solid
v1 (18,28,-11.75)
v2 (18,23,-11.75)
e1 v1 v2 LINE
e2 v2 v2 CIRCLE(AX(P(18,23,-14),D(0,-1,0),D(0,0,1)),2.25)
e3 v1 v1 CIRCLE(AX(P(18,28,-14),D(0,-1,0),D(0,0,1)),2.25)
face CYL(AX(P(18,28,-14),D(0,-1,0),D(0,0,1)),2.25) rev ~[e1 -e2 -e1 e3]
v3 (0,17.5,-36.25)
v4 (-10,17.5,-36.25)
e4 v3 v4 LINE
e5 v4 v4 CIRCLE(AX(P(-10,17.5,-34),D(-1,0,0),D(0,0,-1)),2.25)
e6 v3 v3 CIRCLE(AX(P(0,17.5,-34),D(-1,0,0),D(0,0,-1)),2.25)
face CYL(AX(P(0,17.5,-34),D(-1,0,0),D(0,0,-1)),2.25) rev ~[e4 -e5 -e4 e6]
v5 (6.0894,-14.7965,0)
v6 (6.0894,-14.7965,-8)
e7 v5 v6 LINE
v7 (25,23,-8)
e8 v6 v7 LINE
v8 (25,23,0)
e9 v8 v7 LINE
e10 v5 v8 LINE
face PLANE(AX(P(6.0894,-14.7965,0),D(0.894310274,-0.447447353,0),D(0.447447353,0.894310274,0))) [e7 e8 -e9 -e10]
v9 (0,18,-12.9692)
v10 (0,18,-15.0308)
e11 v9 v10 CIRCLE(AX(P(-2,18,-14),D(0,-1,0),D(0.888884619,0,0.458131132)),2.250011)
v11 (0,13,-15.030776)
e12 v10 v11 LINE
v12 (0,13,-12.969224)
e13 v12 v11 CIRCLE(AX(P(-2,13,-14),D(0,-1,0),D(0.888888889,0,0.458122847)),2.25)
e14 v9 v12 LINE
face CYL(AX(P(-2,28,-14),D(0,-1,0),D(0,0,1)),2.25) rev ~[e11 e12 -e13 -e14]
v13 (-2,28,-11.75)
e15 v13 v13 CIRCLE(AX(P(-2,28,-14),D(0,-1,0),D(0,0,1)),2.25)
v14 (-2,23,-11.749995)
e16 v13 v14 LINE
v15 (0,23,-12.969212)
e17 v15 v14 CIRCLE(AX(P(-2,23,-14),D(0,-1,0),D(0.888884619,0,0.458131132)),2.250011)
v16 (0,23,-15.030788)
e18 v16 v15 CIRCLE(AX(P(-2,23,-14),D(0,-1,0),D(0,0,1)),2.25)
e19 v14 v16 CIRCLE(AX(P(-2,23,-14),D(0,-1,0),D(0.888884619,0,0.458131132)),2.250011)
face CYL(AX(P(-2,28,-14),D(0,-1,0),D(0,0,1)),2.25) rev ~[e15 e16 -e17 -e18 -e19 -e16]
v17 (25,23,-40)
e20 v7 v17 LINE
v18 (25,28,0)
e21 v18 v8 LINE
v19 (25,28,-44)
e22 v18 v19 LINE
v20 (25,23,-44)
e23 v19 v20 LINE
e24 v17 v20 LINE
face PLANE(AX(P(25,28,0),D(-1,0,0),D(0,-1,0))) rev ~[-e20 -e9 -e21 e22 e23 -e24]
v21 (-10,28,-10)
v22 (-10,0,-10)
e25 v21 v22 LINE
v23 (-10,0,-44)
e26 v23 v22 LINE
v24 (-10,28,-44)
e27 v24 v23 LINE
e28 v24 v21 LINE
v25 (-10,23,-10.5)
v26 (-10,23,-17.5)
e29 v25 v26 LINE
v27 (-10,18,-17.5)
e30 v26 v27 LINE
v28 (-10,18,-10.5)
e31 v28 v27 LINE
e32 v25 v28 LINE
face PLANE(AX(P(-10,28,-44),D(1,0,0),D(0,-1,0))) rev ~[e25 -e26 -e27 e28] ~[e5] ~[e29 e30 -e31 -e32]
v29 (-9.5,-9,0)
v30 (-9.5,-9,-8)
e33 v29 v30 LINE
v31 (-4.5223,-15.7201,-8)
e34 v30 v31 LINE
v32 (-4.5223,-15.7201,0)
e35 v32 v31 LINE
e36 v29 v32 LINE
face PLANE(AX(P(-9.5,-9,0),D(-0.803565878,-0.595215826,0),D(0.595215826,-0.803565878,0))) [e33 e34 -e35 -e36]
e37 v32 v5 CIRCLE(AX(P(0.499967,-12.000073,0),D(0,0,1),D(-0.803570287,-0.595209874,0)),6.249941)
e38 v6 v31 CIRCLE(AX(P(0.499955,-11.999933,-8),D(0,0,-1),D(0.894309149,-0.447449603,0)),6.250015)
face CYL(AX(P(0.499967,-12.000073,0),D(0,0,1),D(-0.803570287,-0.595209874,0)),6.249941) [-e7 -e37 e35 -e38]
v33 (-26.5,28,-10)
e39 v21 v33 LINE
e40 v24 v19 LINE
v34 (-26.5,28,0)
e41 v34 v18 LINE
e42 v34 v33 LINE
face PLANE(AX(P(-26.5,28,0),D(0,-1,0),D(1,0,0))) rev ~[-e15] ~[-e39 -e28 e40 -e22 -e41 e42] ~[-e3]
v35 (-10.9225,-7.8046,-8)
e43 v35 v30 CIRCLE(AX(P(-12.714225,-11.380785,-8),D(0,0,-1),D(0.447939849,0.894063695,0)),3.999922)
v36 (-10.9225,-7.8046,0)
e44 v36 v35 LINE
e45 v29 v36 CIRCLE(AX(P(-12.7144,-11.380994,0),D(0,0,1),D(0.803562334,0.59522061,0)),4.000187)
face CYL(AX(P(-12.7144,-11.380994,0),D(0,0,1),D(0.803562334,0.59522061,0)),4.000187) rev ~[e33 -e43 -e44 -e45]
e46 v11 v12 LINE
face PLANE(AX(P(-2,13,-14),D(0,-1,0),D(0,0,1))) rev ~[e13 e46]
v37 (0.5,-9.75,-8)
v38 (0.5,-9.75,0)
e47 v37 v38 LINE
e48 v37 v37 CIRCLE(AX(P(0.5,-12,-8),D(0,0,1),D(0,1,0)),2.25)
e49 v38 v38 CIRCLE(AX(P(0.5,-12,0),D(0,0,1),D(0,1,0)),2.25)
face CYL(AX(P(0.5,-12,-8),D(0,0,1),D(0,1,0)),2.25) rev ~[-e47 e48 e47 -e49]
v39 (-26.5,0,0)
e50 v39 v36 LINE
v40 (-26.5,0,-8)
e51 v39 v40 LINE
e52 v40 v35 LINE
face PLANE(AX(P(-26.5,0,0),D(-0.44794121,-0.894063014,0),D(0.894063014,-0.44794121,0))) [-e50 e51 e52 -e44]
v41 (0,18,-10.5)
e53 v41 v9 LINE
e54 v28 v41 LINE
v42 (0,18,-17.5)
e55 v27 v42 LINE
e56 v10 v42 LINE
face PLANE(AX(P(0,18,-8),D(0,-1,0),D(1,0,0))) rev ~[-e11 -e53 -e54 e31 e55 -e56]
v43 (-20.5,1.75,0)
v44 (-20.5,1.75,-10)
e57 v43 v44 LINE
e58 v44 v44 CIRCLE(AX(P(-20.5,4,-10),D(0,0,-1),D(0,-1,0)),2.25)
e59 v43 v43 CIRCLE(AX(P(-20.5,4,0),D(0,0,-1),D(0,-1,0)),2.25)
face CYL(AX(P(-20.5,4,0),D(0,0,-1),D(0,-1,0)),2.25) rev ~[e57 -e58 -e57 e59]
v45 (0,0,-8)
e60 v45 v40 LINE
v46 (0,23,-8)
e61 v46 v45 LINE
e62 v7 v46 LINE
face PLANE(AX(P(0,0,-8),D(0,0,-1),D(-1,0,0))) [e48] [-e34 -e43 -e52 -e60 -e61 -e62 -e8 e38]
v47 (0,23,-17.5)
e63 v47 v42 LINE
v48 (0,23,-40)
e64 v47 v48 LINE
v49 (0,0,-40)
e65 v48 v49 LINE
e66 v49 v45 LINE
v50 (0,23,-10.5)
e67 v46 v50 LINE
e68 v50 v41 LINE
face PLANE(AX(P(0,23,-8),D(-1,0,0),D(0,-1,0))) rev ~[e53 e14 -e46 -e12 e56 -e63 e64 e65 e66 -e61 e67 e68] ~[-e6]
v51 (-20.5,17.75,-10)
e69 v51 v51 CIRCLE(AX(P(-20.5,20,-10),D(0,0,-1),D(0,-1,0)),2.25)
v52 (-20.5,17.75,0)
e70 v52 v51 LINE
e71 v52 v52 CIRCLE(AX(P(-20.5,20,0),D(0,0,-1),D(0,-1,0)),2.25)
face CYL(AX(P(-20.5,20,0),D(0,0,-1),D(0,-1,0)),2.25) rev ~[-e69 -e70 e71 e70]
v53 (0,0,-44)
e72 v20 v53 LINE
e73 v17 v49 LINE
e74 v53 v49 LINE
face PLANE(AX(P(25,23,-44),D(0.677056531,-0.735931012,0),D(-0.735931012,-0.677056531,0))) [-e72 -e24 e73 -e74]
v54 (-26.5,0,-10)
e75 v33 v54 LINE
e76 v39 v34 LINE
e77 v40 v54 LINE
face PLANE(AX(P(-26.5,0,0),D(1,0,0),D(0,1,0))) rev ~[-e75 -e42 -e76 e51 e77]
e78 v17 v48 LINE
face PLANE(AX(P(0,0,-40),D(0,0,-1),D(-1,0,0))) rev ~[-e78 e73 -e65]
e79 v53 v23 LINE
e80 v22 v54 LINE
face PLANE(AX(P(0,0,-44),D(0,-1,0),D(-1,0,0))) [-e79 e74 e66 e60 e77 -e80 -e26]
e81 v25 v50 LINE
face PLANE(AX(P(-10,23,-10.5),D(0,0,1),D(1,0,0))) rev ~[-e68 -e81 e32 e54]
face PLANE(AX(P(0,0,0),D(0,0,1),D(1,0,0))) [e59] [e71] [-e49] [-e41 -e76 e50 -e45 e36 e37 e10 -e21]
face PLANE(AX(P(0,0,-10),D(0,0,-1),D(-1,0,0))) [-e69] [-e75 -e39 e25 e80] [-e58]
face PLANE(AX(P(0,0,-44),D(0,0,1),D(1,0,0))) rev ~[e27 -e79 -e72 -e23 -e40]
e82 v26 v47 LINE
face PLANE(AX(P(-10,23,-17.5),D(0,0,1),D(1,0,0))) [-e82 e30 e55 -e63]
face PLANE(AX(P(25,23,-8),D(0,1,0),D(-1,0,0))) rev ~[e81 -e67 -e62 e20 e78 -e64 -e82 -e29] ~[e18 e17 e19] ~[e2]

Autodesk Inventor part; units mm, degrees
ref_plane "YZ Plane" through (0, 0, 0) normal (1, 0, 0) x (0, 1, 0)
ref_plane "XZ Plane" through (0, 0, 0) normal (0, 1, 0) x (-1, 0, 0)
ref_plane "XY Plane" through (0, 0, 0) normal (0, 0, 1) x (1, 0, 0)
sketch "Sketch1" plane through (0, 0, 0) normal (0, 0, 1) x (1, 0, 0)
  line L0 (-26.5, 28) -> (25, 28)
  line L1 (-26.5, 0) -> (-26.5, 28)
  line L2 (25, 28) -> (25, 23)
  arc A0 (-9.5, -9) -> (-10.9225, -7.8046) centre (-12.7143, -11.3809) ccw
  line L3 (-26.5, 0) -> (-10.9225, -7.8046)
  line L4 (-9.5, -9) -> (-4.5223, -15.7201)
  arc A1 (-4.5223, -15.7201) -> (6.0894, -14.7965) centre (0.5, -12) ccw
  line L5 (6.0894, -14.7965) -> (25, 23)
extrude "Extrusion5" add sketch "Sketch1" against normal blind 44
sketch "Sketch2" plane through (0, 0, -44) normal (0, 0, -1) x (-1, 0, 0)
  line L0 (26.5, 0) -> (10.9225, -7.8046)
  arc A0 (-6.0894, -14.7965) -> (4.5223, -15.7201) centre (-0.5, -12) ccw
  line L1 (-25, 23) -> (0, 0)
  arc A1 (10.9225, -7.8046) -> (9.5, -9) centre (12.7143, -11.3809) ccw
  line L2 (-6.0894, -14.7965) -> (-25, 23)
  line L3 (0, 0) -> (26.5, 0)
  line L4 (9.5, -9) -> (4.5223, -15.7201)
extrude "Extrusion4" cut sketch "Sketch2" against normal blind 36
sketch "Sketch3" plane through (0, 0, -8) normal (0, 0, -1) x (-1, 0, 0)
  line L0 (0, 23) -> (0, 0)
  line L1 (-25, 23) -> (0, 23)
  line L2 (-25, 23) -> (0, 0)
extrude "Extrusion3" cut sketch "Sketch3" along normal blind 32
sketch "Sketch4" plane through (0, 0, -44) normal (0, 0, -1) x (-1, 0, 0)
  line L0 (10, 28) -> (10, 0)
  line L1 (10, 0) -> (26.5, 0)
  line L2 (10, 28) -> (26.5, 28)
  line L3 (26.5, 28) -> (26.5, 0)
extrude "Extrusion2" cut sketch "Sketch4" against normal blind 34 draft 0
hole "Hole6" at (-2, 28, -14) direction (0, -1, 0) diameter 4.5 depth 15
sketch "Sketch6" plane through (0, 23, -8) normal (0, -1, 0) x (1, 0, 0)
  line L0 (0, -2.5) -> (0, -4.9692)
  line L1 (-10, -9.5) -> (0, -9.5)
  line L2 (-10, -2.5) -> (0, -2.5)
  line L3 (0, -7.0308) -> (0, -9.5)
  arc A0 (0, -4.9692) -> (0, -7.0308) centre (-2, -6) ccw
  line L4 (-10, -2.5) -> (-10, -9.5)
extrude "Extrusion1" cut sketch "Sketch6" along normal blind 5
hole "Hole5" at (18, 28, -14) direction (0, -1, 0) diameter 4.5 depth 5
hole "Hole4" at (0, 17.5, -34) direction (-1, 0, 0) diameter 4.5 depth 10
sketch "Sketch8" plane through (0, 0, 0) normal (1, 0, 0) x (0, 1, 0)
  point P0 (17.5, -34)
hole "Hole3" at (0.5, -12, -8) direction (0, 0, 1) diameter 4.5 depth 8
sketch "Sketch7" plane through (-26.5, 28, 0) normal (0, 1, 0) x (1, 0, 0)
  point P0 (44.5, 14)
hole "Hole2" at (-20.5, 4, 0) direction (0, 0, -1) diameter 4.5 depth 10
sketch "Sketch5" plane through (-26.5, 28, 0) normal (0, 1, 0) x (1, 0, 0)
  point P0 (24.5, 14)
hole "Hole1" at (-20.5, 20, 0) direction (0, 0, -1) diameter 4.5 depth 10
sketch "Sketch9" plane through (0, 0, -8) normal (0, 0, -1) x (-1, 0, 0)
  point P0 (-0.5, -12)
sketch "Sketch10" plane through (0, 0, 0) normal (0, 0, 1) x (1, 0, 0)
  point P0 (-20.5, 4)
sketch "Sketch11" plane through (0, 0, 0) normal (0, 0, 1) x (1, 0, 0)
  point P0 (-20.5, 20)
properties part number "Hopper Idler" material "ABS Plastic"
